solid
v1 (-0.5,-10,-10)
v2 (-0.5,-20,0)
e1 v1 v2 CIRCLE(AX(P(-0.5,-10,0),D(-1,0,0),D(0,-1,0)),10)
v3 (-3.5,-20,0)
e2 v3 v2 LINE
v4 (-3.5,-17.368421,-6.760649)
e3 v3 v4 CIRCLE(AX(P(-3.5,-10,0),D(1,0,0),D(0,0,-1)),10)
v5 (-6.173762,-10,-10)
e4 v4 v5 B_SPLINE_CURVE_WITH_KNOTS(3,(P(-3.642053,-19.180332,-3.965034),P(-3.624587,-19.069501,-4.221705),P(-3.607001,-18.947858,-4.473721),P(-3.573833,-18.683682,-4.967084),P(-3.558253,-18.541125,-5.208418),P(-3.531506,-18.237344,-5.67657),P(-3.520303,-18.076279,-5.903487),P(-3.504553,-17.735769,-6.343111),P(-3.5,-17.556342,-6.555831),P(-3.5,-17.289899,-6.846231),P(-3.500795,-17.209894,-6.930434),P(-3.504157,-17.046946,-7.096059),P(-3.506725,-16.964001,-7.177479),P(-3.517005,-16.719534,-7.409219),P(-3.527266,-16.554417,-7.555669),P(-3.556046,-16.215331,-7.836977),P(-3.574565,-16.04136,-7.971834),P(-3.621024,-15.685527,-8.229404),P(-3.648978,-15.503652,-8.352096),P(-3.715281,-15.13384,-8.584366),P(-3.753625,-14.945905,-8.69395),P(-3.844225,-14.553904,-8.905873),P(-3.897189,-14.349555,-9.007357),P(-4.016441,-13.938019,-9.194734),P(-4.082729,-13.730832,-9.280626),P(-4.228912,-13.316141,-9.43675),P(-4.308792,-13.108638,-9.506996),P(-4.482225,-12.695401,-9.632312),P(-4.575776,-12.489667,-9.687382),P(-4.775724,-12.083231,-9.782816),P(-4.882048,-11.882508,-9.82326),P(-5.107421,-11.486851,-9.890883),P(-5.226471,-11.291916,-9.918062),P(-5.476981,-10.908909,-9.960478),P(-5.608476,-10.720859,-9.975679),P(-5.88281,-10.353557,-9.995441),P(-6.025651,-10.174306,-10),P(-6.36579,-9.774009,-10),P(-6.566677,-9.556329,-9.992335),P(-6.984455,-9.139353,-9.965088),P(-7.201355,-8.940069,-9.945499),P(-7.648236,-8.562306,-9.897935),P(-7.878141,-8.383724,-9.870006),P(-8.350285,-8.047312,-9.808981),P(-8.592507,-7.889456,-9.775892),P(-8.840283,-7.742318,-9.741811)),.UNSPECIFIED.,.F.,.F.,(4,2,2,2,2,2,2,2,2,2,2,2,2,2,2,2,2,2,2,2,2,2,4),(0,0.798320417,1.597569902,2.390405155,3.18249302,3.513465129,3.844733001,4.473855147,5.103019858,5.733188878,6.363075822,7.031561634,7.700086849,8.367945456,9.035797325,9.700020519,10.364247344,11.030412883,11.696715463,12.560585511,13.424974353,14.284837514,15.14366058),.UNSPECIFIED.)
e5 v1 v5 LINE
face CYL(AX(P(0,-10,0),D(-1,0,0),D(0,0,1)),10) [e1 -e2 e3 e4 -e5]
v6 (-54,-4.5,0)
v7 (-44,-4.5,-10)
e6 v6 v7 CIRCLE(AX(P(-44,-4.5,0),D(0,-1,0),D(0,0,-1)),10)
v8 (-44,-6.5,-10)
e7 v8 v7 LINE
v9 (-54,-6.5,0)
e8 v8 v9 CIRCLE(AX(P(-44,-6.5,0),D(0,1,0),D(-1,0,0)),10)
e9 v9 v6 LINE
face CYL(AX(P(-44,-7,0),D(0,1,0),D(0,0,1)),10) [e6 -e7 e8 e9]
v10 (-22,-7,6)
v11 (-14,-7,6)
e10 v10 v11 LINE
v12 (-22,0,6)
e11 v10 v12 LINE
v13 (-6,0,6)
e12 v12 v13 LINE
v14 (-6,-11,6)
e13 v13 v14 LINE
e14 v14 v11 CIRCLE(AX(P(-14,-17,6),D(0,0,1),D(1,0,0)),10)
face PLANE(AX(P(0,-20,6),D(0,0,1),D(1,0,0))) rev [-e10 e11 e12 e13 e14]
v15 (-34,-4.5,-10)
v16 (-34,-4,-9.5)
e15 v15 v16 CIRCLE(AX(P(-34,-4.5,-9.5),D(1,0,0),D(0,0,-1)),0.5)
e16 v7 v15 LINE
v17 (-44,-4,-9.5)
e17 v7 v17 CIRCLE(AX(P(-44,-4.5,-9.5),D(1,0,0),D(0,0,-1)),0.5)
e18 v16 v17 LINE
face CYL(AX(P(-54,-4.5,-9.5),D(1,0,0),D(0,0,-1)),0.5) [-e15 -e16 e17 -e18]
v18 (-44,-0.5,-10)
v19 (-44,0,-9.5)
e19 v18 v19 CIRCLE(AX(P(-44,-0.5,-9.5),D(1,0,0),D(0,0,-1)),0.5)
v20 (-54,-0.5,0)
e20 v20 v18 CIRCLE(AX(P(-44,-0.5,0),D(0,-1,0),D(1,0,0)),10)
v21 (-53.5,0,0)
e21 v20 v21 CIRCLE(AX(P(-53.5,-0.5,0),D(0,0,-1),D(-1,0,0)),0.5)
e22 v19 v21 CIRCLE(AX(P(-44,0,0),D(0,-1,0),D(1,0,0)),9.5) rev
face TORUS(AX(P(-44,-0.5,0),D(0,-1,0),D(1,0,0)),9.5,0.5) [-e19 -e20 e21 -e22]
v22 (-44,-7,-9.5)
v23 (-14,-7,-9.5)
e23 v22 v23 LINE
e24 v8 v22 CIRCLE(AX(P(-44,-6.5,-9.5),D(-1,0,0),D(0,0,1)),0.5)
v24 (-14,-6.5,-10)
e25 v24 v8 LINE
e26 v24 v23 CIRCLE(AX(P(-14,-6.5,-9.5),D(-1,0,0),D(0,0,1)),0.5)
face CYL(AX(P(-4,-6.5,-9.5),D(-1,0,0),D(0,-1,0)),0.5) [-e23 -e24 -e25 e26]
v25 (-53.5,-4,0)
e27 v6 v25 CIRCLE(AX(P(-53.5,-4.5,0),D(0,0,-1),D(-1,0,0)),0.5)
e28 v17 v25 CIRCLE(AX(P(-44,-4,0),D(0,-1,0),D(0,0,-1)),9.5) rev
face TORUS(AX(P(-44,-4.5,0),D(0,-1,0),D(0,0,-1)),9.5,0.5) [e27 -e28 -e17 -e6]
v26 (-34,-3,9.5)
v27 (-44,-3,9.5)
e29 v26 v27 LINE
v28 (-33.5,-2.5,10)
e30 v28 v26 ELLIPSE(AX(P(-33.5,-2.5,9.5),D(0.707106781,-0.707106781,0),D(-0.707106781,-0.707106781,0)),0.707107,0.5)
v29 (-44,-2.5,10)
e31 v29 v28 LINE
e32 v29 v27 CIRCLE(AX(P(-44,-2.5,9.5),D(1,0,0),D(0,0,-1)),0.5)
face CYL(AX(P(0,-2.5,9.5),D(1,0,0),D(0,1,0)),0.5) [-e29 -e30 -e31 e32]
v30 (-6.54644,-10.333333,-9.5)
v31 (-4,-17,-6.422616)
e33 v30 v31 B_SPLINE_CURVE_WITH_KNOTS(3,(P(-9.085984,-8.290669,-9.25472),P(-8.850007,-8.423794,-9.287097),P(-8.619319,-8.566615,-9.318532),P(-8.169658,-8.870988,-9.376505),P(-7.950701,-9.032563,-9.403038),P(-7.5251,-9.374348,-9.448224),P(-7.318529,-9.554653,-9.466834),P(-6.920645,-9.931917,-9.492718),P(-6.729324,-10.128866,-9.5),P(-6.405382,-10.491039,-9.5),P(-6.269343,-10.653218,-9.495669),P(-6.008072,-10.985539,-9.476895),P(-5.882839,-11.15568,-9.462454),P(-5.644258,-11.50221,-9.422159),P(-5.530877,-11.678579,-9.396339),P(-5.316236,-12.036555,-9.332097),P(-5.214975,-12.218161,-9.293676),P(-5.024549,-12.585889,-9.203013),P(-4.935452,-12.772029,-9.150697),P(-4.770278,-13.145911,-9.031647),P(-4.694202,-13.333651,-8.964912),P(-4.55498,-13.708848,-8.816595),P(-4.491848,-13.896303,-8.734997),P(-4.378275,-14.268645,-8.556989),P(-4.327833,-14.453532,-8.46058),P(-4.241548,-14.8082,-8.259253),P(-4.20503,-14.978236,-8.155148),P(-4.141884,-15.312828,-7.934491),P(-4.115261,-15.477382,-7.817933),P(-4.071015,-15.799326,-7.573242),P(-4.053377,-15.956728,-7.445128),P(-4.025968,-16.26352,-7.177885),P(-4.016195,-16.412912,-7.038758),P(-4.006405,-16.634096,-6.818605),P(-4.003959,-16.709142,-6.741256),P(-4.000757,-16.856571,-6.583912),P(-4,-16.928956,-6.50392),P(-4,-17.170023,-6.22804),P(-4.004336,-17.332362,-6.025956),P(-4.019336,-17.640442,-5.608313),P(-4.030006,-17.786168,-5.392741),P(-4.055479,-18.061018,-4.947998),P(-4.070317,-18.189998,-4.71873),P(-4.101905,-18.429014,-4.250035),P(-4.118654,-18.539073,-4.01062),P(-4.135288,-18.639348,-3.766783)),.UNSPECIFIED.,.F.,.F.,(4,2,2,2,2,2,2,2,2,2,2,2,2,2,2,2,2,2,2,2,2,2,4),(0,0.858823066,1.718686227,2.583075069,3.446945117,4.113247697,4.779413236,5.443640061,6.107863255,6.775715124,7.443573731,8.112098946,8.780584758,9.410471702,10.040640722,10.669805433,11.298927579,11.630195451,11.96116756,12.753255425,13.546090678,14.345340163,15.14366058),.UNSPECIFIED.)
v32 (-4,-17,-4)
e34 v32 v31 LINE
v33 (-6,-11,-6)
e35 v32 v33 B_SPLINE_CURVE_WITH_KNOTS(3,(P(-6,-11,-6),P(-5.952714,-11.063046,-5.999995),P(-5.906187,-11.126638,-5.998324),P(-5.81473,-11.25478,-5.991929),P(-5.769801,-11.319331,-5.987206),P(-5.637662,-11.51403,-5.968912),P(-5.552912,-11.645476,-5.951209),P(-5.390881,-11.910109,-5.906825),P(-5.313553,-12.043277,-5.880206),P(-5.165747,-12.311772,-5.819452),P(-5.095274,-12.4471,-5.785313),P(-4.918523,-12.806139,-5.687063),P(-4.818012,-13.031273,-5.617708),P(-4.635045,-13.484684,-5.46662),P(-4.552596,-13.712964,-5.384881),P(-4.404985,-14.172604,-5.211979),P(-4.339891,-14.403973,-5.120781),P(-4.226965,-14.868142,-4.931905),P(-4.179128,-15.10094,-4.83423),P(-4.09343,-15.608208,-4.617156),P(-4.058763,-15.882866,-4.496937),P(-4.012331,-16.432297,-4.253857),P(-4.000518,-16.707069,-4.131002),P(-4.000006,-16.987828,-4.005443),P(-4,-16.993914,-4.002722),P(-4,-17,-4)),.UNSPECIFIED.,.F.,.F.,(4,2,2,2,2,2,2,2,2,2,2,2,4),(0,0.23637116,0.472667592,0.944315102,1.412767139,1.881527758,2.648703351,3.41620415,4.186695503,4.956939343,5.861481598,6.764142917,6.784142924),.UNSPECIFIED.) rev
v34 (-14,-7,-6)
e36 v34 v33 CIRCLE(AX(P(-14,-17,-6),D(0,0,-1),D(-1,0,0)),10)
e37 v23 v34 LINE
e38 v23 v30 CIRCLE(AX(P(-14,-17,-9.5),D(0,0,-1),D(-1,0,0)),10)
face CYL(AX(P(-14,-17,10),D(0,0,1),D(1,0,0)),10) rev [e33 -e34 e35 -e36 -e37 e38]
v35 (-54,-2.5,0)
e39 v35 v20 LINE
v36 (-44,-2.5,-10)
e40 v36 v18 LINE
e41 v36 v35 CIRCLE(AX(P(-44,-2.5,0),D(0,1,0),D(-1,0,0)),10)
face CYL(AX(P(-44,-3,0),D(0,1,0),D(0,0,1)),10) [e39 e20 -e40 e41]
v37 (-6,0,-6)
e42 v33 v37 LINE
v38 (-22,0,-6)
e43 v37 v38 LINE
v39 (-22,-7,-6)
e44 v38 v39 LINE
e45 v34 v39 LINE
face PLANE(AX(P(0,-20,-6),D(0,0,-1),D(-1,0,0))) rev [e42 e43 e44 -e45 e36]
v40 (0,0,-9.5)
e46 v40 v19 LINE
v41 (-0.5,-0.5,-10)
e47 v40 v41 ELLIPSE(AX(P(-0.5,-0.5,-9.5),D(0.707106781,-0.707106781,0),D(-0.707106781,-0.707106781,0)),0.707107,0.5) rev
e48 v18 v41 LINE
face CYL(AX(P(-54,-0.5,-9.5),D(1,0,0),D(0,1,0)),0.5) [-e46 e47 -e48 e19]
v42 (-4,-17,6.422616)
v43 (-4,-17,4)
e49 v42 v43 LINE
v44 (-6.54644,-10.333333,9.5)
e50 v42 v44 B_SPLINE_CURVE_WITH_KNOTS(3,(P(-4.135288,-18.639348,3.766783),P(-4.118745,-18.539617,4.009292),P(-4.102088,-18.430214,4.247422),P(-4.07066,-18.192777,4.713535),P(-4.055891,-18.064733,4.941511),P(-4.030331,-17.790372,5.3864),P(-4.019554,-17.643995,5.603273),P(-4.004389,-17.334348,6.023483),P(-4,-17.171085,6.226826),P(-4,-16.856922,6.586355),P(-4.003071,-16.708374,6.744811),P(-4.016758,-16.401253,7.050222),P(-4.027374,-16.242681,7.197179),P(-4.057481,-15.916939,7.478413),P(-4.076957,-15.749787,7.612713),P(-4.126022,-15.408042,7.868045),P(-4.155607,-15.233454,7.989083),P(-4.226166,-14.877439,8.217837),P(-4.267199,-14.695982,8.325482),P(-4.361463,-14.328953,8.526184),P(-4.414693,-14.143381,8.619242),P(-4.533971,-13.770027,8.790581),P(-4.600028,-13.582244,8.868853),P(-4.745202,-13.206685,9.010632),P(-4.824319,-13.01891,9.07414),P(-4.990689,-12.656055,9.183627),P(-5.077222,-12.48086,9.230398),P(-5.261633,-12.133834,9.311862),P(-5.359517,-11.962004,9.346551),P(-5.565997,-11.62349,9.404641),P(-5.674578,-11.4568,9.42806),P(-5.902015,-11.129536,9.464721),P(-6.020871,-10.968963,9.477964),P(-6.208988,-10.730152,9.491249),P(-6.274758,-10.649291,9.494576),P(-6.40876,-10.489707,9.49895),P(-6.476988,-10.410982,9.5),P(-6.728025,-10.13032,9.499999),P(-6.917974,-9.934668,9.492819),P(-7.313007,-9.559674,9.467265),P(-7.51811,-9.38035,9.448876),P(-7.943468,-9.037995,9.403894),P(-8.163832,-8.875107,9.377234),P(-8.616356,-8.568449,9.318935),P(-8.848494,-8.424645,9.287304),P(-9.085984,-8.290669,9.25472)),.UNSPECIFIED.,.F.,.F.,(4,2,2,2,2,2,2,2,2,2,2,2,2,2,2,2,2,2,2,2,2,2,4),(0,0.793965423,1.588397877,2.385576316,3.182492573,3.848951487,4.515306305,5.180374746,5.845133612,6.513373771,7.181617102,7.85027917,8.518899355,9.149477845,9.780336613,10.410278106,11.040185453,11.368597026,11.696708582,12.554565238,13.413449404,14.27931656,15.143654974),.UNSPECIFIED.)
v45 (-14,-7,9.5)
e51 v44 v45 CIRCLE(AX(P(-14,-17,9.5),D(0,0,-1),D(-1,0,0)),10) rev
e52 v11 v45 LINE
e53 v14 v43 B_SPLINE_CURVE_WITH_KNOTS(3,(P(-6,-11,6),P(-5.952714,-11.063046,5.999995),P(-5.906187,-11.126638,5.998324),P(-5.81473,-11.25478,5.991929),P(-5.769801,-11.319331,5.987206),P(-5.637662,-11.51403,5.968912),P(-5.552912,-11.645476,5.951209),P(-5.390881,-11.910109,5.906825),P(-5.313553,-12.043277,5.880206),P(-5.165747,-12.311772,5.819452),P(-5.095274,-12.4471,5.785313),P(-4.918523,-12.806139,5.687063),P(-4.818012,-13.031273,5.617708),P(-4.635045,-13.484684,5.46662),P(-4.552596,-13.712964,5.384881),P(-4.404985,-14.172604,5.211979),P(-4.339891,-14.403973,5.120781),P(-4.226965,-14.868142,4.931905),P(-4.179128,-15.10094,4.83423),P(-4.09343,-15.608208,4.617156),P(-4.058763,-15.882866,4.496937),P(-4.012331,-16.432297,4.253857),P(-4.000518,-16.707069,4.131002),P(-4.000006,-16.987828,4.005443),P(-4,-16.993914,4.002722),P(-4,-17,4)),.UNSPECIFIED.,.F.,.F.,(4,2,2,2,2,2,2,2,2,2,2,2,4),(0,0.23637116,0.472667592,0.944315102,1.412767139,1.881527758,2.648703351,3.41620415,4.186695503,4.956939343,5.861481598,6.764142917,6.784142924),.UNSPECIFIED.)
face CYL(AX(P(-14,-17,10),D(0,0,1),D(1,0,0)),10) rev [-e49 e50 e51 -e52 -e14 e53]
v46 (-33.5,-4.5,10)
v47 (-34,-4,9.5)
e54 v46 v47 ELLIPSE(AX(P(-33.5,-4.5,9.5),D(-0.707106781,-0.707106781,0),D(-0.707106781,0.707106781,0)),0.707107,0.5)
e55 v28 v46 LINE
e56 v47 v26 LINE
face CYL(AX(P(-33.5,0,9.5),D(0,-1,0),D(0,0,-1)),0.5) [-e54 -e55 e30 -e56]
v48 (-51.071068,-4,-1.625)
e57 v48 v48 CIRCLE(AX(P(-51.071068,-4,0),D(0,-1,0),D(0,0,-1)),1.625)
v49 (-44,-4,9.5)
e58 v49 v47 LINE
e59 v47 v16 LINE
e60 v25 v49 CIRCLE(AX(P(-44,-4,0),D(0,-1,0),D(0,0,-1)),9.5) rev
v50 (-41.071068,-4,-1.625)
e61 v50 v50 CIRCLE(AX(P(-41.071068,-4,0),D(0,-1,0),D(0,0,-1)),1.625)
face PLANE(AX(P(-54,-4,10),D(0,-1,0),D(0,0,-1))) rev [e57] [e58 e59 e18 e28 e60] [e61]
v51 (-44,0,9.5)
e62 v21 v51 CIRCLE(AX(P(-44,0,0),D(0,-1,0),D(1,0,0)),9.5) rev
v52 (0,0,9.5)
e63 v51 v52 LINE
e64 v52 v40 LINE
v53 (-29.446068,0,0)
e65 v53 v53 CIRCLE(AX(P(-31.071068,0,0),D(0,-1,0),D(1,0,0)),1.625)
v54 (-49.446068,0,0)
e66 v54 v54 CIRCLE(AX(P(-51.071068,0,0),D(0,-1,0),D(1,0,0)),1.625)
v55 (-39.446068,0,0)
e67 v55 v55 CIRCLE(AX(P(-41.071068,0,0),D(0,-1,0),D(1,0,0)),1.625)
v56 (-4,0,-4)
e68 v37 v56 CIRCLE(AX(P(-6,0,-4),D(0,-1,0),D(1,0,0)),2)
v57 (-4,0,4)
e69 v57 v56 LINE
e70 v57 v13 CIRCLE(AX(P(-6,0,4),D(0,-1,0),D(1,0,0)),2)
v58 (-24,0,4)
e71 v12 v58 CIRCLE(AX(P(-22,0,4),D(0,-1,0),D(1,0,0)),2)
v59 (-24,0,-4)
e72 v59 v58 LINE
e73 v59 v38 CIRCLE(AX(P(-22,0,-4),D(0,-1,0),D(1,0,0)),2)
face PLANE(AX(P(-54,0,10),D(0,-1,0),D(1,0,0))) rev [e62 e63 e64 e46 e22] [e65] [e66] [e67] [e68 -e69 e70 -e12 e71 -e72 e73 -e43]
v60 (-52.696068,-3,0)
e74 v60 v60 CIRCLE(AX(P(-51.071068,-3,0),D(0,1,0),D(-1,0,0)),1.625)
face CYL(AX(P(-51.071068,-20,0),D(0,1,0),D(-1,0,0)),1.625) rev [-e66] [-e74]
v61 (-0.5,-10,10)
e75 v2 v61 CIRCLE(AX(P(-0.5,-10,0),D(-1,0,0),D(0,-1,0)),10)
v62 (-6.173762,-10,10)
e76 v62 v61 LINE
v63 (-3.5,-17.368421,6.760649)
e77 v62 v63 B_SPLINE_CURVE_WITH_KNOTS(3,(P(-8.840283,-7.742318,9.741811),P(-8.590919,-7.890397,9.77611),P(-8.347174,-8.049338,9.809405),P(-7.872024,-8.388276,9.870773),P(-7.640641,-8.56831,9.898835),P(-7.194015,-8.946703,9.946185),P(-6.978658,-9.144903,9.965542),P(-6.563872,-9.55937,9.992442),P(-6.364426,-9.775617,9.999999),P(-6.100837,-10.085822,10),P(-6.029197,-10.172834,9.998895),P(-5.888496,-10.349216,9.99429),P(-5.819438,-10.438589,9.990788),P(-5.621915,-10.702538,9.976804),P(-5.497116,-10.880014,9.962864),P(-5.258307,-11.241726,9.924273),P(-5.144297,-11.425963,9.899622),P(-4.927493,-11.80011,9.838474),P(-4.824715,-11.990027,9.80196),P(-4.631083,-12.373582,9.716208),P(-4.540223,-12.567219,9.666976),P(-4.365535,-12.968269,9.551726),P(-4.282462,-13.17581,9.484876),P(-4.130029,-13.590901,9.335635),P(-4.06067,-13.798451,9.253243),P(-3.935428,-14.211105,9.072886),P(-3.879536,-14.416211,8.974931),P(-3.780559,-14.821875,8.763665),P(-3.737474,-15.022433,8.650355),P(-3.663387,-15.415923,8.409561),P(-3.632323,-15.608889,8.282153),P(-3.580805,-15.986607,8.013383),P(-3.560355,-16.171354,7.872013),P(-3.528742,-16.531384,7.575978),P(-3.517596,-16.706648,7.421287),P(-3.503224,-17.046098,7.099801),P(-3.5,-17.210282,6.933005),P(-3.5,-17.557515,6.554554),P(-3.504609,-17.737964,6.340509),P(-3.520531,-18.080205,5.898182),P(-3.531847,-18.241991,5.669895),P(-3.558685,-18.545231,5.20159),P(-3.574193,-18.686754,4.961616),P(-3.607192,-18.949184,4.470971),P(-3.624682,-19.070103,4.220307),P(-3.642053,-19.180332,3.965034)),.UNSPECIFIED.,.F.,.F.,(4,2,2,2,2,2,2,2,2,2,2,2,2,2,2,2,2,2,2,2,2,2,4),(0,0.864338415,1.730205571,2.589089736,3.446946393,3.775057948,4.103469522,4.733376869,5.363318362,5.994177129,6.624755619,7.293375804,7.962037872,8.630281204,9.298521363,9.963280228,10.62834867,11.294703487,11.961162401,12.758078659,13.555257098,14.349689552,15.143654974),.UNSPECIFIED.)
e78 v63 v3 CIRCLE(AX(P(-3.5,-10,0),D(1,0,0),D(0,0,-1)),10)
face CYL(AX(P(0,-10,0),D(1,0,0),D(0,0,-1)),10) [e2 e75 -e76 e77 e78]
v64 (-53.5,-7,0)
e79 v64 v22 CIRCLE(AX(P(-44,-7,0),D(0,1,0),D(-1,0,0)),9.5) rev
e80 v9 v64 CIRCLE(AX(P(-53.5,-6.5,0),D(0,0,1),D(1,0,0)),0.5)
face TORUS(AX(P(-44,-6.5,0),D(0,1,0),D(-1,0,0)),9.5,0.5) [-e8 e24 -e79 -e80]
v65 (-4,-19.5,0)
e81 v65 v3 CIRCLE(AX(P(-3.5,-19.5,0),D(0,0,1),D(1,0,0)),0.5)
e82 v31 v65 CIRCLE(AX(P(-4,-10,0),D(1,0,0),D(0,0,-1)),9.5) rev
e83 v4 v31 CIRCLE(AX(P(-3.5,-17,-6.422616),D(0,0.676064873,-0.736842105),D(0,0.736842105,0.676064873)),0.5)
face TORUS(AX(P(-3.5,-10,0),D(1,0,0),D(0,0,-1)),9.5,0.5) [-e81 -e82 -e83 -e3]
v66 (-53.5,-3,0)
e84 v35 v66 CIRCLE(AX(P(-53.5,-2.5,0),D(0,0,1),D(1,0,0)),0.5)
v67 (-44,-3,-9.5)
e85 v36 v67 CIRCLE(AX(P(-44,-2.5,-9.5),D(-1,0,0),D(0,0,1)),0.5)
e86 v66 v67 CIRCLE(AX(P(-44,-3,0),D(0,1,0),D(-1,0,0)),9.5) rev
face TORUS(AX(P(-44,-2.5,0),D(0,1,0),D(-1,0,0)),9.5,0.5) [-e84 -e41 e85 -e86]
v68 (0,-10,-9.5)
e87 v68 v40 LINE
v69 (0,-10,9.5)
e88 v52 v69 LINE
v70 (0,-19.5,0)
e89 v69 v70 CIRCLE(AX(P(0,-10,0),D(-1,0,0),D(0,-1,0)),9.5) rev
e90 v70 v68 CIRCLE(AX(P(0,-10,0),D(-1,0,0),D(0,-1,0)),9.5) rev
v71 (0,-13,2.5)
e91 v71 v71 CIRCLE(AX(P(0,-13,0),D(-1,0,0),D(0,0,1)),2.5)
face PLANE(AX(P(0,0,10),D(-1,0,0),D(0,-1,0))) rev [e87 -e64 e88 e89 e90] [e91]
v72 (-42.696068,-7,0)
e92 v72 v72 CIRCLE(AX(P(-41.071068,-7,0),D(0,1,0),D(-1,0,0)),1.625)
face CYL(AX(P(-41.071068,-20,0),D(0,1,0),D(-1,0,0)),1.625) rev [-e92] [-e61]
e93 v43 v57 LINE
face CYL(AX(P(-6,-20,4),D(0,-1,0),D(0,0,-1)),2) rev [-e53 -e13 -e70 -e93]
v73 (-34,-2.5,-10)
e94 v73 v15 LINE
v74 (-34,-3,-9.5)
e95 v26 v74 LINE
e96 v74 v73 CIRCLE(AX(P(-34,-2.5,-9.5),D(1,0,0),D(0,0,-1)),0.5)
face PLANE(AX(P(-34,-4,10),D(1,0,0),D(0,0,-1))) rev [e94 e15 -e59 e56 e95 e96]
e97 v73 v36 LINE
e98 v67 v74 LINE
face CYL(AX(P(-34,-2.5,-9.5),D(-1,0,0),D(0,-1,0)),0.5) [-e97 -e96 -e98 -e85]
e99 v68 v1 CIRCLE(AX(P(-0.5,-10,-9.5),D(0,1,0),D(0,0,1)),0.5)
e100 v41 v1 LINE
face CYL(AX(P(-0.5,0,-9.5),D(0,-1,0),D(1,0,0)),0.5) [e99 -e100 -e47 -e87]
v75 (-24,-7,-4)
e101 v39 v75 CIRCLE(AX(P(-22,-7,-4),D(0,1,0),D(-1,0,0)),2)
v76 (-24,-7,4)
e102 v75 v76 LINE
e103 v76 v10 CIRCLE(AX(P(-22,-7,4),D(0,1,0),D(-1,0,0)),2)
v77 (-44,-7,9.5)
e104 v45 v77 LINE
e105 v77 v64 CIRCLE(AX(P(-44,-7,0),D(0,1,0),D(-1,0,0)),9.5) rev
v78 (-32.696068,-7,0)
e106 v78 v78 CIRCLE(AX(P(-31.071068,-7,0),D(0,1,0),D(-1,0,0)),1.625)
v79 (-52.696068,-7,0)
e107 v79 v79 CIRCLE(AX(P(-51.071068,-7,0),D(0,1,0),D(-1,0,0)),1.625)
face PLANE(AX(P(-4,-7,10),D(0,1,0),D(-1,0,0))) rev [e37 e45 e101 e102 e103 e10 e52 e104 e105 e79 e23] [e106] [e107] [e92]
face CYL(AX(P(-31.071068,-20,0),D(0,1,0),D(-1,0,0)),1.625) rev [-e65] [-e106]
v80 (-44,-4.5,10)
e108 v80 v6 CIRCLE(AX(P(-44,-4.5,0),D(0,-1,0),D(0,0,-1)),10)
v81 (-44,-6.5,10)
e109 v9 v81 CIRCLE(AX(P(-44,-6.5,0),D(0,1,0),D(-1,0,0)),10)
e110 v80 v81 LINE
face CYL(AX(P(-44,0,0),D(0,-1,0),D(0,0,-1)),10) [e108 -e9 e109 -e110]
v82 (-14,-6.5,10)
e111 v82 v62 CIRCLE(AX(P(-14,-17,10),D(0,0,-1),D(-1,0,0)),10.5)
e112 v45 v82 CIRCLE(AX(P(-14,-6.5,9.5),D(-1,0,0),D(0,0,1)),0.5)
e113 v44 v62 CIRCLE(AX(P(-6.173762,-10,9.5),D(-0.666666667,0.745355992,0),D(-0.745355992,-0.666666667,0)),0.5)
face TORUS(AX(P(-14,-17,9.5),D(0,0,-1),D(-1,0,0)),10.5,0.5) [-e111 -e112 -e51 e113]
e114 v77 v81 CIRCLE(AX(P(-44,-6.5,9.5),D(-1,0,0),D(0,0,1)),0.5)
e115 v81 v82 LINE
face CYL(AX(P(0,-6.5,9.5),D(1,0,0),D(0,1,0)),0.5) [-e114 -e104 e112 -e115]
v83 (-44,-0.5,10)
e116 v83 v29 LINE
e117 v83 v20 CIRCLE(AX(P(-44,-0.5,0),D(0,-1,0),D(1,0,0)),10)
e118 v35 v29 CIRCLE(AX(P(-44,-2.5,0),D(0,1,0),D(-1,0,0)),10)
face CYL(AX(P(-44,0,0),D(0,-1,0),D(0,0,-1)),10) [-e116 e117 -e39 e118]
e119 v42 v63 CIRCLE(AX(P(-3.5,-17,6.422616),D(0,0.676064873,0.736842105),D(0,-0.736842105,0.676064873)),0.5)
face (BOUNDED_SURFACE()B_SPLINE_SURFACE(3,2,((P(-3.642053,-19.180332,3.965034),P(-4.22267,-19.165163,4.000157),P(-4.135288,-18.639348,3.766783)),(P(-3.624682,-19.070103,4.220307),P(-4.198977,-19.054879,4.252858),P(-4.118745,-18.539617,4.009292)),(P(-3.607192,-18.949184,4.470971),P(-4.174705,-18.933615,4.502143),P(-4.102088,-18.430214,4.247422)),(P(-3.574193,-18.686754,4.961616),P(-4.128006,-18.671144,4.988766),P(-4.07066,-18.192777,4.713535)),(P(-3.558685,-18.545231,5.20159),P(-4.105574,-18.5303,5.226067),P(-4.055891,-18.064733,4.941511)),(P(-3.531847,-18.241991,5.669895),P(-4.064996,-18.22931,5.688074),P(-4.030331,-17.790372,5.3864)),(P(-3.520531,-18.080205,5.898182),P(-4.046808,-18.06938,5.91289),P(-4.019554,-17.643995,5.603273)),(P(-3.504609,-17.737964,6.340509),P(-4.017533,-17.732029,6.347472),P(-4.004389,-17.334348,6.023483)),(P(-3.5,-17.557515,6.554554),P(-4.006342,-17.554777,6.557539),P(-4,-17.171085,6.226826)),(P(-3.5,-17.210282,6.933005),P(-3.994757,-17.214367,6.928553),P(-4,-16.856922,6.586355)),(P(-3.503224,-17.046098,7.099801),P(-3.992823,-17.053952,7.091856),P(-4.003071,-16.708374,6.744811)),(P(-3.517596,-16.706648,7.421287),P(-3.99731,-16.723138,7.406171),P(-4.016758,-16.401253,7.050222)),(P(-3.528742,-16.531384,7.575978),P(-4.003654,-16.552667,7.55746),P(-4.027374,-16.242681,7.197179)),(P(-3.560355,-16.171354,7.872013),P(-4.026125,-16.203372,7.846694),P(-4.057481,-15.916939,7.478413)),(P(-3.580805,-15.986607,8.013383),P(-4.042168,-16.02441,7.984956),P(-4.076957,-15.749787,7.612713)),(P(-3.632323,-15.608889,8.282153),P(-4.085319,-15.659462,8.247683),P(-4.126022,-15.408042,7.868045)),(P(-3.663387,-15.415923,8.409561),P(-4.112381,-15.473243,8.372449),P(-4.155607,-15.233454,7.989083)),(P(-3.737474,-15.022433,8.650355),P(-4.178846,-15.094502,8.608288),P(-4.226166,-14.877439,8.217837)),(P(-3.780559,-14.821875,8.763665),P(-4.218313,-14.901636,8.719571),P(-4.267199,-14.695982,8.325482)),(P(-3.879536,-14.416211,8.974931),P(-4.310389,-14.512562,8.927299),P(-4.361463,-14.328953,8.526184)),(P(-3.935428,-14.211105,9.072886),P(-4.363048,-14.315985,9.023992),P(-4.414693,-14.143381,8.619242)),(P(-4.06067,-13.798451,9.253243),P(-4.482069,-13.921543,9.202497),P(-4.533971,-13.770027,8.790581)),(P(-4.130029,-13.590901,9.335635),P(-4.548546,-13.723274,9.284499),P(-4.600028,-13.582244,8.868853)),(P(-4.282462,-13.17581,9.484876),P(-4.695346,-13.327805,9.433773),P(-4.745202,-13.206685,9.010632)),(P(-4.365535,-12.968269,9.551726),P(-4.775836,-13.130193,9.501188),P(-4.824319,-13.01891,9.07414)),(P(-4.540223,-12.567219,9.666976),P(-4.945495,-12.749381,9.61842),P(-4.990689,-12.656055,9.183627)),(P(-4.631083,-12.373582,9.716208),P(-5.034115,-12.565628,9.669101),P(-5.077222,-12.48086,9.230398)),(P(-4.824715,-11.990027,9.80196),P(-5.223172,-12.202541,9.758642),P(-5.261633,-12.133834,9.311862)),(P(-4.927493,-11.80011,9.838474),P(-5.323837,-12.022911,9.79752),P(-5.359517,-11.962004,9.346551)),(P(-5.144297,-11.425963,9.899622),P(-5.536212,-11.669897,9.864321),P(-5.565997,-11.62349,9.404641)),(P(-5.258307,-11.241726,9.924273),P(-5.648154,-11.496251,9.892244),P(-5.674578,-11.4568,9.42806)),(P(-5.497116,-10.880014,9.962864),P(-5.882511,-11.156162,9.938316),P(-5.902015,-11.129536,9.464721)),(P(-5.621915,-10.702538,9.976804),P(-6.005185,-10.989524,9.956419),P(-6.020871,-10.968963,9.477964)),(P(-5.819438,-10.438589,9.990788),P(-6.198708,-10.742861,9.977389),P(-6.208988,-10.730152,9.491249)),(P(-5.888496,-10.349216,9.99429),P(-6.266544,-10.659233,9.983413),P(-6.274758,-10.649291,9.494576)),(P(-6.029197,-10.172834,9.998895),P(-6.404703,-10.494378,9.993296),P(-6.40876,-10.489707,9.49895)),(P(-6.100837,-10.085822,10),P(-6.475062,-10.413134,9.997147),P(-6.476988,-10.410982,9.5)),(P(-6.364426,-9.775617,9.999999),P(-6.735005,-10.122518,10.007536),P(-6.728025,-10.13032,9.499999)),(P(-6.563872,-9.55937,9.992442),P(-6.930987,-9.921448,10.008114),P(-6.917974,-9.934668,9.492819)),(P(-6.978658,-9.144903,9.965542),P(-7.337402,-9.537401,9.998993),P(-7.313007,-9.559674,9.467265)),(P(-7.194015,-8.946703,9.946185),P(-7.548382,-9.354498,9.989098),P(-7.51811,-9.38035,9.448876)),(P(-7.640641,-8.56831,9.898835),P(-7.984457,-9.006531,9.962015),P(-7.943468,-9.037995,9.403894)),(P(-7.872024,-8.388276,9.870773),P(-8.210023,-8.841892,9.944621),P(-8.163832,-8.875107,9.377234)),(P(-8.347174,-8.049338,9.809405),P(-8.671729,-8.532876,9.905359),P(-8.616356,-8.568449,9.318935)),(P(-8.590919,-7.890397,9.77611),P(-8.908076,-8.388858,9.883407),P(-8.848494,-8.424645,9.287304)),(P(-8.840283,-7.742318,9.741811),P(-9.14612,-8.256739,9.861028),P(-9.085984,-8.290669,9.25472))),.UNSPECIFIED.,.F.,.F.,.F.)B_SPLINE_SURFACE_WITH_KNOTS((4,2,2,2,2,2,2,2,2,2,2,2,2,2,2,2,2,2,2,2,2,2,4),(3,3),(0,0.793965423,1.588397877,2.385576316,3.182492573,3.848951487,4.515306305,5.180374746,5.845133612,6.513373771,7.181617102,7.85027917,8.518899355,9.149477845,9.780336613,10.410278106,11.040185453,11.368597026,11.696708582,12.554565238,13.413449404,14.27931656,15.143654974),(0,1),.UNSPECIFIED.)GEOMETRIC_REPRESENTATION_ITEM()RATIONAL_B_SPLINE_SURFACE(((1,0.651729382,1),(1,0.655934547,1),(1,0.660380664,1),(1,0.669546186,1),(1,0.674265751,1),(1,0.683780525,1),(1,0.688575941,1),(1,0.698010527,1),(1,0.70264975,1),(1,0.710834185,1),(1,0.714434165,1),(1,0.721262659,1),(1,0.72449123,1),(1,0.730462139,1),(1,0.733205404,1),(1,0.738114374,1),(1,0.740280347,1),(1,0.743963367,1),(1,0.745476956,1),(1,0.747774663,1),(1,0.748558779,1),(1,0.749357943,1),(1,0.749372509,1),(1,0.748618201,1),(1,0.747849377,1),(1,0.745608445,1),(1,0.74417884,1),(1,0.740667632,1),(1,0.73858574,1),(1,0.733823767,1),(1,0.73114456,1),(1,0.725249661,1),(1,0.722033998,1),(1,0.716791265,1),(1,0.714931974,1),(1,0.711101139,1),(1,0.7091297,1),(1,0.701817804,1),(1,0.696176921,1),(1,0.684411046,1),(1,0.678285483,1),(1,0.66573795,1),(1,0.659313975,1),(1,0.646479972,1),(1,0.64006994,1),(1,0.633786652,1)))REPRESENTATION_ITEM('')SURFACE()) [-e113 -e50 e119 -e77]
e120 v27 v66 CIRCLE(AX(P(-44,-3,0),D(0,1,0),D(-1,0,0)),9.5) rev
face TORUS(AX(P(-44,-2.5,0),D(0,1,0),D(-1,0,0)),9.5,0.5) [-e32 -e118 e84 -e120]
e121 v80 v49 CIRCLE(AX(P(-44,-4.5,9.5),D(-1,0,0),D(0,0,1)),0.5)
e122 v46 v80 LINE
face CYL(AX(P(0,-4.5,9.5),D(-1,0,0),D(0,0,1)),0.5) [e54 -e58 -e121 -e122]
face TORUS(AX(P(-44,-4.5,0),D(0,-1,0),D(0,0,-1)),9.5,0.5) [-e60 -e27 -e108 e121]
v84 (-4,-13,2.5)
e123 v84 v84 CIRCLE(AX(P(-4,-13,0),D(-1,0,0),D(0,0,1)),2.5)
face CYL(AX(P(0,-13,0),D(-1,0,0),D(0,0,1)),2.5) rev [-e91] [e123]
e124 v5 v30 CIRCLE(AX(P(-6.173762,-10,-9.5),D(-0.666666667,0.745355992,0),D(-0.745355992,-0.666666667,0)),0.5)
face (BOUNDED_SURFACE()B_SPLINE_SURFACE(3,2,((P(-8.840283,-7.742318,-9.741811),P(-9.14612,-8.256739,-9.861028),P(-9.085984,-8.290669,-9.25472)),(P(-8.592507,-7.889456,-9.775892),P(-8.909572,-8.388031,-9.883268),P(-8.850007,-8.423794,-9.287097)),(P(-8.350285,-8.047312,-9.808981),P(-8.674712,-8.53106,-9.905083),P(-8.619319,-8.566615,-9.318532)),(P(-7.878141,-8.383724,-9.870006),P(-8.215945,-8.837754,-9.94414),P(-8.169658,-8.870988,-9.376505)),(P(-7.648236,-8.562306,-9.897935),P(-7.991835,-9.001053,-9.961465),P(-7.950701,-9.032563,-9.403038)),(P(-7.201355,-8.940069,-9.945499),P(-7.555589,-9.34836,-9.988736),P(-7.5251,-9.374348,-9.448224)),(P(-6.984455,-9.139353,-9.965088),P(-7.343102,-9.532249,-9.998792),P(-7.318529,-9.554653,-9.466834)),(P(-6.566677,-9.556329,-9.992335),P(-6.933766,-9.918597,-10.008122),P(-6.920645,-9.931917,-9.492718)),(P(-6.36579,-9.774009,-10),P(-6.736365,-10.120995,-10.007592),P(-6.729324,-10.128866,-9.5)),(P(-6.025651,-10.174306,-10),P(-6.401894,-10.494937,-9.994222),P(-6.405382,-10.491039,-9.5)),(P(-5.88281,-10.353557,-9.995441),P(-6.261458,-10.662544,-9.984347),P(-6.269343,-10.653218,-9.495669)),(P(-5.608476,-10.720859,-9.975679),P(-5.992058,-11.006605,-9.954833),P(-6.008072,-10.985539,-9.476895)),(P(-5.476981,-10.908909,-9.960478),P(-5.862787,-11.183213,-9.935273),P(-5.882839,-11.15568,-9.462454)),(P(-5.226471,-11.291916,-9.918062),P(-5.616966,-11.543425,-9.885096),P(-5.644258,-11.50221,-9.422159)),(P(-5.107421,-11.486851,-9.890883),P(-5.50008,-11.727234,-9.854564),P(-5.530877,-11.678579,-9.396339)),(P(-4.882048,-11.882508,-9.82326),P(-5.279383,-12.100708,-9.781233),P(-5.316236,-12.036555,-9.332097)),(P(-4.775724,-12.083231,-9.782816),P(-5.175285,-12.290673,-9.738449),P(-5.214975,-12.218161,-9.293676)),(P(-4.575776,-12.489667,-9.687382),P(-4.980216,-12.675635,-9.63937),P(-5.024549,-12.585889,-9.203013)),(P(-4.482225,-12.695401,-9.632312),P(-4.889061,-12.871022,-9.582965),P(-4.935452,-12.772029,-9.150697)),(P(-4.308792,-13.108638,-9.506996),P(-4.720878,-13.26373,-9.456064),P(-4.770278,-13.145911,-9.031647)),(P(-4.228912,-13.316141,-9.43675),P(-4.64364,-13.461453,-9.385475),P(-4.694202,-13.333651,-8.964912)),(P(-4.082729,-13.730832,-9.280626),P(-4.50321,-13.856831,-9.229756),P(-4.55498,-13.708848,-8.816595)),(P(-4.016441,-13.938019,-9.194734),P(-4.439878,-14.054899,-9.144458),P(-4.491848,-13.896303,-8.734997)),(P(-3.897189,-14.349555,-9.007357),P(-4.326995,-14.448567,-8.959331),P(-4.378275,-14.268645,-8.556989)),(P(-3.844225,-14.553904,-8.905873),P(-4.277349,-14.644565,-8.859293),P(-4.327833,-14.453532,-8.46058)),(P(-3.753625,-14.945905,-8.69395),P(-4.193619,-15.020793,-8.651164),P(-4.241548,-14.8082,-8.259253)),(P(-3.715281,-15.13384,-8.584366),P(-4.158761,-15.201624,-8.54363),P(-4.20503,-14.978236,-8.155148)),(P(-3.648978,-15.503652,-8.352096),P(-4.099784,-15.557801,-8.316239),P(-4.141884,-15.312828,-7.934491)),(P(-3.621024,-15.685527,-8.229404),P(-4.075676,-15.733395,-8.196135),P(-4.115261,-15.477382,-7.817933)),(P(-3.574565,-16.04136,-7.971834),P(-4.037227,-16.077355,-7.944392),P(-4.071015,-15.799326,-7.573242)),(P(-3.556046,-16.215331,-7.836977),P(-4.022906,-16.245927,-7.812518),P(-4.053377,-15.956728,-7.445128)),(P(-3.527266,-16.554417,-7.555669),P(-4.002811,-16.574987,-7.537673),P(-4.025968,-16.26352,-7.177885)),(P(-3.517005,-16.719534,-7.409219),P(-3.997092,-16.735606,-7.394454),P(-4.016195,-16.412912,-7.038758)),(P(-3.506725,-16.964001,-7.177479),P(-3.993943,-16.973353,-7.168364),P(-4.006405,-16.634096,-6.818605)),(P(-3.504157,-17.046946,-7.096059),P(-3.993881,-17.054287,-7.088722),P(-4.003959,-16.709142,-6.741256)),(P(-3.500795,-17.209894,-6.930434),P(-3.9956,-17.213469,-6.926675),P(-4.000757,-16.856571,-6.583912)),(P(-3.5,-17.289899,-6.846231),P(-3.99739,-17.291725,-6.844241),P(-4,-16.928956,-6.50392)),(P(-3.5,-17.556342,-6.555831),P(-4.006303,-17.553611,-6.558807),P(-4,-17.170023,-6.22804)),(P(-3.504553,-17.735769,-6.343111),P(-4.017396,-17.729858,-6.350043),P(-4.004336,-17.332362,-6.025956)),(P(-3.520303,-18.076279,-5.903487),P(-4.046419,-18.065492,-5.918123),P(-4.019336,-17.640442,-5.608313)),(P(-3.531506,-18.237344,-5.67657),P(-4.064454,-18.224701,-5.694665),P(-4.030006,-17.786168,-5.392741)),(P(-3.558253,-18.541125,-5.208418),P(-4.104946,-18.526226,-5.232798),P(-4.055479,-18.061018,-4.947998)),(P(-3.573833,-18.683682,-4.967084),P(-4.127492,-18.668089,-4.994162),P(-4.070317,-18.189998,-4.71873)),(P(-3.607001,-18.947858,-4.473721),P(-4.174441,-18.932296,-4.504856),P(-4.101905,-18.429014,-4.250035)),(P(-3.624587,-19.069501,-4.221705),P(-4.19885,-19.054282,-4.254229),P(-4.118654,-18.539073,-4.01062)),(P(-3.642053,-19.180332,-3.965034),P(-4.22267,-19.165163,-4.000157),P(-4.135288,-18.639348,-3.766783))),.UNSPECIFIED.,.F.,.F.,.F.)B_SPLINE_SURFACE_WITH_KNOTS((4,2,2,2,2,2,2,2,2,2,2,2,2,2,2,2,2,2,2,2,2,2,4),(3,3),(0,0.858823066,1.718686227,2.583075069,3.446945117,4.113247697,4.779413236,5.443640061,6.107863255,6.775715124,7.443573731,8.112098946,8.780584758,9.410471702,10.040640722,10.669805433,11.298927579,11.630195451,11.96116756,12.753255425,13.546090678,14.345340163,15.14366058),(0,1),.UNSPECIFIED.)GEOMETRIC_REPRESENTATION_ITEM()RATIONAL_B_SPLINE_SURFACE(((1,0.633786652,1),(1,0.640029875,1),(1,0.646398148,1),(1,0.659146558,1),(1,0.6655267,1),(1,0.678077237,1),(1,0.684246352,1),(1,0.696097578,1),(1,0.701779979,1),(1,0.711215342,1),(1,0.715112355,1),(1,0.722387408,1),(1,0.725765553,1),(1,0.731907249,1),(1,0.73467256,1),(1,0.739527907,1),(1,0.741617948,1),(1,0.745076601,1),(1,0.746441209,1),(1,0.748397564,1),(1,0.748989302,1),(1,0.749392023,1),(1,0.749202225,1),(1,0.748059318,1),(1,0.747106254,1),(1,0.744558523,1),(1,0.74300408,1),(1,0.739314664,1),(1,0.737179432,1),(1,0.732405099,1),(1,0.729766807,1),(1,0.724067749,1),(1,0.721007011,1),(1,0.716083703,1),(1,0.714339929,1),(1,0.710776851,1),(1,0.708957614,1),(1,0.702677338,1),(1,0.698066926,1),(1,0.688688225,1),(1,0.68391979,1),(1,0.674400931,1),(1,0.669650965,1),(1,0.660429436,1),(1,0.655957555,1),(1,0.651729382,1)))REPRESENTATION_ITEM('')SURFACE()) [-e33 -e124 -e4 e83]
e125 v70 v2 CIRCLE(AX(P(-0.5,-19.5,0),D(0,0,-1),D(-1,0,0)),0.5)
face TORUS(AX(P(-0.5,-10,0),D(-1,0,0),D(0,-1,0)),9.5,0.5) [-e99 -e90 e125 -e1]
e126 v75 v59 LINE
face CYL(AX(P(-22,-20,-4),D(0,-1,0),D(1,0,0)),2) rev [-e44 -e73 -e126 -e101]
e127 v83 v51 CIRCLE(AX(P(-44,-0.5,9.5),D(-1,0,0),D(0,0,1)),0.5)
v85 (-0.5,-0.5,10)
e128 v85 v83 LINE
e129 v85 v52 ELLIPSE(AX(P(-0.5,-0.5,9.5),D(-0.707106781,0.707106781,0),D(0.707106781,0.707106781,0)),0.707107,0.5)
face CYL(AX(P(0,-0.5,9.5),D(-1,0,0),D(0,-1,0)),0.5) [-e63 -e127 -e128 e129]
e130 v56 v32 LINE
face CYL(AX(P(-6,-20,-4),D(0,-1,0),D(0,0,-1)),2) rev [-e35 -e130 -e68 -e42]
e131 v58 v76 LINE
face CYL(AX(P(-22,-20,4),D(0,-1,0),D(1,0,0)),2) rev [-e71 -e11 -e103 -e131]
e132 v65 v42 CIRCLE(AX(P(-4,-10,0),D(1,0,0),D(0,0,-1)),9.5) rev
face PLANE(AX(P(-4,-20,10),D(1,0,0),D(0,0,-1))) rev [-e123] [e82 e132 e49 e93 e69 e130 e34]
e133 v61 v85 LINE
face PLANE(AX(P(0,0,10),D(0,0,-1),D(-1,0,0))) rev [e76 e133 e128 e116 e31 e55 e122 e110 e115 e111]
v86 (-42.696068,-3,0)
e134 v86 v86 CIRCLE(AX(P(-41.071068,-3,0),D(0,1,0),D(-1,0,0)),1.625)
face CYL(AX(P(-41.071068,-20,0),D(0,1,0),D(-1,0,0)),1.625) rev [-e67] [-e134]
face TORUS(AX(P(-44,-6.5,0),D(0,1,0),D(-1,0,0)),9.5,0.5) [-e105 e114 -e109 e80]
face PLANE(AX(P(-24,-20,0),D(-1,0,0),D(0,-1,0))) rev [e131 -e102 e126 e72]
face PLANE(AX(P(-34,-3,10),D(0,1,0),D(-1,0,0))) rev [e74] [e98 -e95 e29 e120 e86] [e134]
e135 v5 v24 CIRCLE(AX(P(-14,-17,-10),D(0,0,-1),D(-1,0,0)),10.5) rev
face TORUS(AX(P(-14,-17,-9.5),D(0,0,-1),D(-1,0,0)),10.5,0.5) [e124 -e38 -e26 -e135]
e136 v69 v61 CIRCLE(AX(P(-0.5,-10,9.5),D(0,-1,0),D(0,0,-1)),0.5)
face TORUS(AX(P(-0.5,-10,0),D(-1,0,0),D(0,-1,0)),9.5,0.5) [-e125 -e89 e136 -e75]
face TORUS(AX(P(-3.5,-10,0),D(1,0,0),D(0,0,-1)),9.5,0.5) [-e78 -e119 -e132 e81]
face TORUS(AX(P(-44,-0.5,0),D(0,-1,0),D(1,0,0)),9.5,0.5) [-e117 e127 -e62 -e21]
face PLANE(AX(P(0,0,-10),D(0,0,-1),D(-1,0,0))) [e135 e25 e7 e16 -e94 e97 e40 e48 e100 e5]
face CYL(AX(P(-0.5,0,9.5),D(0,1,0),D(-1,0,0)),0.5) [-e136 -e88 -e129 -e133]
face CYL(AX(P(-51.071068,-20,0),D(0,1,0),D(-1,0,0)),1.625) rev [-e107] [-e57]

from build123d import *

# Parameters (mm, degrees)
BOSS_EXTRUDE1_DEPTH     = 10
FILLET1_R               = 10
CUT_EXTRUDE1_DEPTH      = 59.446556785
CUT_EXTRUDE1_DEPTH_BACK = 59.446556785
SKETCH3_R               = 1.625
FILLET2_R               = 10
SKETCH4_R               = 2.5
CUT_EXTRUDE2_DEPTH      = 55.772255751
SKETCH5_W               = 20
SKETCH5_H               = 12
CUT_EXTRUDE3_DEPTH      = 59.446556785
FILLET3_R               = 10
FILLET5_R               = 0.5
FILLET6_R               = 2


with BuildPart() as part:
    # Sketch1 → Boss-Extrude1 (new, symmetric)
    with BuildSketch(Plane.XY):
        Polygon((0, 0), (0, -20), (-4, -20), (-4, -7), (-54, -7), (-54, -4), (-34, -4), (-34, -3), (-54, -3), (-54, 0), align=None)
    extrude(amount=BOSS_EXTRUDE1_DEPTH, both=True)

    # Fillet1
    fillet1_edges = [part.edges().sort_by_distance(p)[0] for p in [
        (-54, -5.5, -10),
        (-54, -1.5, -10),
        (-54, -5.5, 10),
        (-54, -1.5, 10),
    ]]
    fillet(fillet1_edges, radius=FILLET1_R - 0.0001)  # a hair under: the kernel refuses the full size

    # Sketch3 → Cut-Extrude1 (cut, two sides: drawn at the far end of the back side and taken through both)
    with BuildSketch(Plane(origin=(0, 0, 0), x_dir=(1, 0, 0), z_dir=(0, 1, 0)).offset(-CUT_EXTRUDE1_DEPTH_BACK)):
        with Locations(Location((-51.071067812, 0, 0), (0, 0, 180))):
            Circle(SKETCH3_R)
        with Locations(Location((-41.071067812, 0, 0), (0, 0, 180))):
            Circle(SKETCH3_R)
        with Locations(Location((-31.071067812, 0, 0), (0, 0, 180))):
            Circle(SKETCH3_R)
    extrude(amount=CUT_EXTRUDE1_DEPTH + CUT_EXTRUDE1_DEPTH_BACK, mode=Mode.SUBTRACT)

    # Fillet2
    fillet2_edges = [part.edges().sort_by_distance(p)[0] for p in [
        (-2, -20, 10),
        (-2, -20, -10),
    ]]
    fillet(fillet2_edges, radius=FILLET2_R - 0.0001)  # a hair under: the kernel refuses the full size

    # Sketch4 → Cut-Extrude2 (cut, through all)
    with BuildSketch(Plane.ZY.offset(4)):
        with Locations((0, -13)):
            Circle(SKETCH4_R)
    extrude(amount=-CUT_EXTRUDE2_DEPTH, mode=Mode.SUBTRACT)

    # Sketch5 → Cut-Extrude3 (cut, through all)
    with BuildSketch(Plane(origin=(0, 0, 0), x_dir=(1, 0, 0), z_dir=(0, 1, 0))):
        with Locations((-14, 0)):
            Rectangle(SKETCH5_W, SKETCH5_H)
    extrude(amount=-CUT_EXTRUDE3_DEPTH, mode=Mode.SUBTRACT)

    # Fillet3
    fillet3_edges = [part.edges().sort_by_distance(p)[0] for p in [
        (-4, -7, -8),
        (-4, -7, 8),
    ]]
    fillet(fillet3_edges, radius=FILLET3_R)

    # Fillet5
    fillet5_edges = [part.edges().sort_by_distance(p)[0] for p in [
        (-4, -19.219544127, -3.873063981),
        (-4.63248147, -13.50005763, -9.367506076),
        (-10.126952105, -7.780482659, -10),
        (-10.126952105, -7.780482659, 10),
        (-4.63248147, -13.50005763, 9.367506076),
        (-39.00005, -4, -10),
        (-22.00005, 0, -10),
        (-34, -3.5, 10),
        (-39.00005, -4, 10),
        (-29.00005, -7, -10),
        (-29.00005, -7, 10),
        (-51.071097101, -7, 7.071097101),
        (-51.071097101, -7, -7.071097101),
        (-39.00005, -3, -10),
        (-51.071097101, -4, 7.071097101),
        (-51.071097101, -4, -7.071097101),
        (-39.00005, -3, 10),
        (-51.071097101, -3, 7.071097101),
        (-51.071097101, -3, -7.071097101),
        (-51.071097101, 0, 7.071097101),
        (-51.071097101, 0, -7.071097101),
        (-22.00005, 0, 10),
        (0, -5.00005, 10),
        (0, -5.00005, -10),
        (0, -17.071097101, -7.071097101),
        (0, -17.071097101, 7.071097101),
        (-4, -19.219544127, 3.873063981),
    ]]
    fillet(fillet5_edges, radius=FILLET5_R)

    # Fillet6
    fillet6_edges = [part.edges().sort_by_distance(p)[0] for p in [
        (-24, -3.5, 6),
        (-4, -8.5, 6),
        (-24, -3.5, -6),
        (-4, -8.5, -6),
    ]]
    fillet(fillet6_edges, radius=FILLET6_R)


solid = part.part
